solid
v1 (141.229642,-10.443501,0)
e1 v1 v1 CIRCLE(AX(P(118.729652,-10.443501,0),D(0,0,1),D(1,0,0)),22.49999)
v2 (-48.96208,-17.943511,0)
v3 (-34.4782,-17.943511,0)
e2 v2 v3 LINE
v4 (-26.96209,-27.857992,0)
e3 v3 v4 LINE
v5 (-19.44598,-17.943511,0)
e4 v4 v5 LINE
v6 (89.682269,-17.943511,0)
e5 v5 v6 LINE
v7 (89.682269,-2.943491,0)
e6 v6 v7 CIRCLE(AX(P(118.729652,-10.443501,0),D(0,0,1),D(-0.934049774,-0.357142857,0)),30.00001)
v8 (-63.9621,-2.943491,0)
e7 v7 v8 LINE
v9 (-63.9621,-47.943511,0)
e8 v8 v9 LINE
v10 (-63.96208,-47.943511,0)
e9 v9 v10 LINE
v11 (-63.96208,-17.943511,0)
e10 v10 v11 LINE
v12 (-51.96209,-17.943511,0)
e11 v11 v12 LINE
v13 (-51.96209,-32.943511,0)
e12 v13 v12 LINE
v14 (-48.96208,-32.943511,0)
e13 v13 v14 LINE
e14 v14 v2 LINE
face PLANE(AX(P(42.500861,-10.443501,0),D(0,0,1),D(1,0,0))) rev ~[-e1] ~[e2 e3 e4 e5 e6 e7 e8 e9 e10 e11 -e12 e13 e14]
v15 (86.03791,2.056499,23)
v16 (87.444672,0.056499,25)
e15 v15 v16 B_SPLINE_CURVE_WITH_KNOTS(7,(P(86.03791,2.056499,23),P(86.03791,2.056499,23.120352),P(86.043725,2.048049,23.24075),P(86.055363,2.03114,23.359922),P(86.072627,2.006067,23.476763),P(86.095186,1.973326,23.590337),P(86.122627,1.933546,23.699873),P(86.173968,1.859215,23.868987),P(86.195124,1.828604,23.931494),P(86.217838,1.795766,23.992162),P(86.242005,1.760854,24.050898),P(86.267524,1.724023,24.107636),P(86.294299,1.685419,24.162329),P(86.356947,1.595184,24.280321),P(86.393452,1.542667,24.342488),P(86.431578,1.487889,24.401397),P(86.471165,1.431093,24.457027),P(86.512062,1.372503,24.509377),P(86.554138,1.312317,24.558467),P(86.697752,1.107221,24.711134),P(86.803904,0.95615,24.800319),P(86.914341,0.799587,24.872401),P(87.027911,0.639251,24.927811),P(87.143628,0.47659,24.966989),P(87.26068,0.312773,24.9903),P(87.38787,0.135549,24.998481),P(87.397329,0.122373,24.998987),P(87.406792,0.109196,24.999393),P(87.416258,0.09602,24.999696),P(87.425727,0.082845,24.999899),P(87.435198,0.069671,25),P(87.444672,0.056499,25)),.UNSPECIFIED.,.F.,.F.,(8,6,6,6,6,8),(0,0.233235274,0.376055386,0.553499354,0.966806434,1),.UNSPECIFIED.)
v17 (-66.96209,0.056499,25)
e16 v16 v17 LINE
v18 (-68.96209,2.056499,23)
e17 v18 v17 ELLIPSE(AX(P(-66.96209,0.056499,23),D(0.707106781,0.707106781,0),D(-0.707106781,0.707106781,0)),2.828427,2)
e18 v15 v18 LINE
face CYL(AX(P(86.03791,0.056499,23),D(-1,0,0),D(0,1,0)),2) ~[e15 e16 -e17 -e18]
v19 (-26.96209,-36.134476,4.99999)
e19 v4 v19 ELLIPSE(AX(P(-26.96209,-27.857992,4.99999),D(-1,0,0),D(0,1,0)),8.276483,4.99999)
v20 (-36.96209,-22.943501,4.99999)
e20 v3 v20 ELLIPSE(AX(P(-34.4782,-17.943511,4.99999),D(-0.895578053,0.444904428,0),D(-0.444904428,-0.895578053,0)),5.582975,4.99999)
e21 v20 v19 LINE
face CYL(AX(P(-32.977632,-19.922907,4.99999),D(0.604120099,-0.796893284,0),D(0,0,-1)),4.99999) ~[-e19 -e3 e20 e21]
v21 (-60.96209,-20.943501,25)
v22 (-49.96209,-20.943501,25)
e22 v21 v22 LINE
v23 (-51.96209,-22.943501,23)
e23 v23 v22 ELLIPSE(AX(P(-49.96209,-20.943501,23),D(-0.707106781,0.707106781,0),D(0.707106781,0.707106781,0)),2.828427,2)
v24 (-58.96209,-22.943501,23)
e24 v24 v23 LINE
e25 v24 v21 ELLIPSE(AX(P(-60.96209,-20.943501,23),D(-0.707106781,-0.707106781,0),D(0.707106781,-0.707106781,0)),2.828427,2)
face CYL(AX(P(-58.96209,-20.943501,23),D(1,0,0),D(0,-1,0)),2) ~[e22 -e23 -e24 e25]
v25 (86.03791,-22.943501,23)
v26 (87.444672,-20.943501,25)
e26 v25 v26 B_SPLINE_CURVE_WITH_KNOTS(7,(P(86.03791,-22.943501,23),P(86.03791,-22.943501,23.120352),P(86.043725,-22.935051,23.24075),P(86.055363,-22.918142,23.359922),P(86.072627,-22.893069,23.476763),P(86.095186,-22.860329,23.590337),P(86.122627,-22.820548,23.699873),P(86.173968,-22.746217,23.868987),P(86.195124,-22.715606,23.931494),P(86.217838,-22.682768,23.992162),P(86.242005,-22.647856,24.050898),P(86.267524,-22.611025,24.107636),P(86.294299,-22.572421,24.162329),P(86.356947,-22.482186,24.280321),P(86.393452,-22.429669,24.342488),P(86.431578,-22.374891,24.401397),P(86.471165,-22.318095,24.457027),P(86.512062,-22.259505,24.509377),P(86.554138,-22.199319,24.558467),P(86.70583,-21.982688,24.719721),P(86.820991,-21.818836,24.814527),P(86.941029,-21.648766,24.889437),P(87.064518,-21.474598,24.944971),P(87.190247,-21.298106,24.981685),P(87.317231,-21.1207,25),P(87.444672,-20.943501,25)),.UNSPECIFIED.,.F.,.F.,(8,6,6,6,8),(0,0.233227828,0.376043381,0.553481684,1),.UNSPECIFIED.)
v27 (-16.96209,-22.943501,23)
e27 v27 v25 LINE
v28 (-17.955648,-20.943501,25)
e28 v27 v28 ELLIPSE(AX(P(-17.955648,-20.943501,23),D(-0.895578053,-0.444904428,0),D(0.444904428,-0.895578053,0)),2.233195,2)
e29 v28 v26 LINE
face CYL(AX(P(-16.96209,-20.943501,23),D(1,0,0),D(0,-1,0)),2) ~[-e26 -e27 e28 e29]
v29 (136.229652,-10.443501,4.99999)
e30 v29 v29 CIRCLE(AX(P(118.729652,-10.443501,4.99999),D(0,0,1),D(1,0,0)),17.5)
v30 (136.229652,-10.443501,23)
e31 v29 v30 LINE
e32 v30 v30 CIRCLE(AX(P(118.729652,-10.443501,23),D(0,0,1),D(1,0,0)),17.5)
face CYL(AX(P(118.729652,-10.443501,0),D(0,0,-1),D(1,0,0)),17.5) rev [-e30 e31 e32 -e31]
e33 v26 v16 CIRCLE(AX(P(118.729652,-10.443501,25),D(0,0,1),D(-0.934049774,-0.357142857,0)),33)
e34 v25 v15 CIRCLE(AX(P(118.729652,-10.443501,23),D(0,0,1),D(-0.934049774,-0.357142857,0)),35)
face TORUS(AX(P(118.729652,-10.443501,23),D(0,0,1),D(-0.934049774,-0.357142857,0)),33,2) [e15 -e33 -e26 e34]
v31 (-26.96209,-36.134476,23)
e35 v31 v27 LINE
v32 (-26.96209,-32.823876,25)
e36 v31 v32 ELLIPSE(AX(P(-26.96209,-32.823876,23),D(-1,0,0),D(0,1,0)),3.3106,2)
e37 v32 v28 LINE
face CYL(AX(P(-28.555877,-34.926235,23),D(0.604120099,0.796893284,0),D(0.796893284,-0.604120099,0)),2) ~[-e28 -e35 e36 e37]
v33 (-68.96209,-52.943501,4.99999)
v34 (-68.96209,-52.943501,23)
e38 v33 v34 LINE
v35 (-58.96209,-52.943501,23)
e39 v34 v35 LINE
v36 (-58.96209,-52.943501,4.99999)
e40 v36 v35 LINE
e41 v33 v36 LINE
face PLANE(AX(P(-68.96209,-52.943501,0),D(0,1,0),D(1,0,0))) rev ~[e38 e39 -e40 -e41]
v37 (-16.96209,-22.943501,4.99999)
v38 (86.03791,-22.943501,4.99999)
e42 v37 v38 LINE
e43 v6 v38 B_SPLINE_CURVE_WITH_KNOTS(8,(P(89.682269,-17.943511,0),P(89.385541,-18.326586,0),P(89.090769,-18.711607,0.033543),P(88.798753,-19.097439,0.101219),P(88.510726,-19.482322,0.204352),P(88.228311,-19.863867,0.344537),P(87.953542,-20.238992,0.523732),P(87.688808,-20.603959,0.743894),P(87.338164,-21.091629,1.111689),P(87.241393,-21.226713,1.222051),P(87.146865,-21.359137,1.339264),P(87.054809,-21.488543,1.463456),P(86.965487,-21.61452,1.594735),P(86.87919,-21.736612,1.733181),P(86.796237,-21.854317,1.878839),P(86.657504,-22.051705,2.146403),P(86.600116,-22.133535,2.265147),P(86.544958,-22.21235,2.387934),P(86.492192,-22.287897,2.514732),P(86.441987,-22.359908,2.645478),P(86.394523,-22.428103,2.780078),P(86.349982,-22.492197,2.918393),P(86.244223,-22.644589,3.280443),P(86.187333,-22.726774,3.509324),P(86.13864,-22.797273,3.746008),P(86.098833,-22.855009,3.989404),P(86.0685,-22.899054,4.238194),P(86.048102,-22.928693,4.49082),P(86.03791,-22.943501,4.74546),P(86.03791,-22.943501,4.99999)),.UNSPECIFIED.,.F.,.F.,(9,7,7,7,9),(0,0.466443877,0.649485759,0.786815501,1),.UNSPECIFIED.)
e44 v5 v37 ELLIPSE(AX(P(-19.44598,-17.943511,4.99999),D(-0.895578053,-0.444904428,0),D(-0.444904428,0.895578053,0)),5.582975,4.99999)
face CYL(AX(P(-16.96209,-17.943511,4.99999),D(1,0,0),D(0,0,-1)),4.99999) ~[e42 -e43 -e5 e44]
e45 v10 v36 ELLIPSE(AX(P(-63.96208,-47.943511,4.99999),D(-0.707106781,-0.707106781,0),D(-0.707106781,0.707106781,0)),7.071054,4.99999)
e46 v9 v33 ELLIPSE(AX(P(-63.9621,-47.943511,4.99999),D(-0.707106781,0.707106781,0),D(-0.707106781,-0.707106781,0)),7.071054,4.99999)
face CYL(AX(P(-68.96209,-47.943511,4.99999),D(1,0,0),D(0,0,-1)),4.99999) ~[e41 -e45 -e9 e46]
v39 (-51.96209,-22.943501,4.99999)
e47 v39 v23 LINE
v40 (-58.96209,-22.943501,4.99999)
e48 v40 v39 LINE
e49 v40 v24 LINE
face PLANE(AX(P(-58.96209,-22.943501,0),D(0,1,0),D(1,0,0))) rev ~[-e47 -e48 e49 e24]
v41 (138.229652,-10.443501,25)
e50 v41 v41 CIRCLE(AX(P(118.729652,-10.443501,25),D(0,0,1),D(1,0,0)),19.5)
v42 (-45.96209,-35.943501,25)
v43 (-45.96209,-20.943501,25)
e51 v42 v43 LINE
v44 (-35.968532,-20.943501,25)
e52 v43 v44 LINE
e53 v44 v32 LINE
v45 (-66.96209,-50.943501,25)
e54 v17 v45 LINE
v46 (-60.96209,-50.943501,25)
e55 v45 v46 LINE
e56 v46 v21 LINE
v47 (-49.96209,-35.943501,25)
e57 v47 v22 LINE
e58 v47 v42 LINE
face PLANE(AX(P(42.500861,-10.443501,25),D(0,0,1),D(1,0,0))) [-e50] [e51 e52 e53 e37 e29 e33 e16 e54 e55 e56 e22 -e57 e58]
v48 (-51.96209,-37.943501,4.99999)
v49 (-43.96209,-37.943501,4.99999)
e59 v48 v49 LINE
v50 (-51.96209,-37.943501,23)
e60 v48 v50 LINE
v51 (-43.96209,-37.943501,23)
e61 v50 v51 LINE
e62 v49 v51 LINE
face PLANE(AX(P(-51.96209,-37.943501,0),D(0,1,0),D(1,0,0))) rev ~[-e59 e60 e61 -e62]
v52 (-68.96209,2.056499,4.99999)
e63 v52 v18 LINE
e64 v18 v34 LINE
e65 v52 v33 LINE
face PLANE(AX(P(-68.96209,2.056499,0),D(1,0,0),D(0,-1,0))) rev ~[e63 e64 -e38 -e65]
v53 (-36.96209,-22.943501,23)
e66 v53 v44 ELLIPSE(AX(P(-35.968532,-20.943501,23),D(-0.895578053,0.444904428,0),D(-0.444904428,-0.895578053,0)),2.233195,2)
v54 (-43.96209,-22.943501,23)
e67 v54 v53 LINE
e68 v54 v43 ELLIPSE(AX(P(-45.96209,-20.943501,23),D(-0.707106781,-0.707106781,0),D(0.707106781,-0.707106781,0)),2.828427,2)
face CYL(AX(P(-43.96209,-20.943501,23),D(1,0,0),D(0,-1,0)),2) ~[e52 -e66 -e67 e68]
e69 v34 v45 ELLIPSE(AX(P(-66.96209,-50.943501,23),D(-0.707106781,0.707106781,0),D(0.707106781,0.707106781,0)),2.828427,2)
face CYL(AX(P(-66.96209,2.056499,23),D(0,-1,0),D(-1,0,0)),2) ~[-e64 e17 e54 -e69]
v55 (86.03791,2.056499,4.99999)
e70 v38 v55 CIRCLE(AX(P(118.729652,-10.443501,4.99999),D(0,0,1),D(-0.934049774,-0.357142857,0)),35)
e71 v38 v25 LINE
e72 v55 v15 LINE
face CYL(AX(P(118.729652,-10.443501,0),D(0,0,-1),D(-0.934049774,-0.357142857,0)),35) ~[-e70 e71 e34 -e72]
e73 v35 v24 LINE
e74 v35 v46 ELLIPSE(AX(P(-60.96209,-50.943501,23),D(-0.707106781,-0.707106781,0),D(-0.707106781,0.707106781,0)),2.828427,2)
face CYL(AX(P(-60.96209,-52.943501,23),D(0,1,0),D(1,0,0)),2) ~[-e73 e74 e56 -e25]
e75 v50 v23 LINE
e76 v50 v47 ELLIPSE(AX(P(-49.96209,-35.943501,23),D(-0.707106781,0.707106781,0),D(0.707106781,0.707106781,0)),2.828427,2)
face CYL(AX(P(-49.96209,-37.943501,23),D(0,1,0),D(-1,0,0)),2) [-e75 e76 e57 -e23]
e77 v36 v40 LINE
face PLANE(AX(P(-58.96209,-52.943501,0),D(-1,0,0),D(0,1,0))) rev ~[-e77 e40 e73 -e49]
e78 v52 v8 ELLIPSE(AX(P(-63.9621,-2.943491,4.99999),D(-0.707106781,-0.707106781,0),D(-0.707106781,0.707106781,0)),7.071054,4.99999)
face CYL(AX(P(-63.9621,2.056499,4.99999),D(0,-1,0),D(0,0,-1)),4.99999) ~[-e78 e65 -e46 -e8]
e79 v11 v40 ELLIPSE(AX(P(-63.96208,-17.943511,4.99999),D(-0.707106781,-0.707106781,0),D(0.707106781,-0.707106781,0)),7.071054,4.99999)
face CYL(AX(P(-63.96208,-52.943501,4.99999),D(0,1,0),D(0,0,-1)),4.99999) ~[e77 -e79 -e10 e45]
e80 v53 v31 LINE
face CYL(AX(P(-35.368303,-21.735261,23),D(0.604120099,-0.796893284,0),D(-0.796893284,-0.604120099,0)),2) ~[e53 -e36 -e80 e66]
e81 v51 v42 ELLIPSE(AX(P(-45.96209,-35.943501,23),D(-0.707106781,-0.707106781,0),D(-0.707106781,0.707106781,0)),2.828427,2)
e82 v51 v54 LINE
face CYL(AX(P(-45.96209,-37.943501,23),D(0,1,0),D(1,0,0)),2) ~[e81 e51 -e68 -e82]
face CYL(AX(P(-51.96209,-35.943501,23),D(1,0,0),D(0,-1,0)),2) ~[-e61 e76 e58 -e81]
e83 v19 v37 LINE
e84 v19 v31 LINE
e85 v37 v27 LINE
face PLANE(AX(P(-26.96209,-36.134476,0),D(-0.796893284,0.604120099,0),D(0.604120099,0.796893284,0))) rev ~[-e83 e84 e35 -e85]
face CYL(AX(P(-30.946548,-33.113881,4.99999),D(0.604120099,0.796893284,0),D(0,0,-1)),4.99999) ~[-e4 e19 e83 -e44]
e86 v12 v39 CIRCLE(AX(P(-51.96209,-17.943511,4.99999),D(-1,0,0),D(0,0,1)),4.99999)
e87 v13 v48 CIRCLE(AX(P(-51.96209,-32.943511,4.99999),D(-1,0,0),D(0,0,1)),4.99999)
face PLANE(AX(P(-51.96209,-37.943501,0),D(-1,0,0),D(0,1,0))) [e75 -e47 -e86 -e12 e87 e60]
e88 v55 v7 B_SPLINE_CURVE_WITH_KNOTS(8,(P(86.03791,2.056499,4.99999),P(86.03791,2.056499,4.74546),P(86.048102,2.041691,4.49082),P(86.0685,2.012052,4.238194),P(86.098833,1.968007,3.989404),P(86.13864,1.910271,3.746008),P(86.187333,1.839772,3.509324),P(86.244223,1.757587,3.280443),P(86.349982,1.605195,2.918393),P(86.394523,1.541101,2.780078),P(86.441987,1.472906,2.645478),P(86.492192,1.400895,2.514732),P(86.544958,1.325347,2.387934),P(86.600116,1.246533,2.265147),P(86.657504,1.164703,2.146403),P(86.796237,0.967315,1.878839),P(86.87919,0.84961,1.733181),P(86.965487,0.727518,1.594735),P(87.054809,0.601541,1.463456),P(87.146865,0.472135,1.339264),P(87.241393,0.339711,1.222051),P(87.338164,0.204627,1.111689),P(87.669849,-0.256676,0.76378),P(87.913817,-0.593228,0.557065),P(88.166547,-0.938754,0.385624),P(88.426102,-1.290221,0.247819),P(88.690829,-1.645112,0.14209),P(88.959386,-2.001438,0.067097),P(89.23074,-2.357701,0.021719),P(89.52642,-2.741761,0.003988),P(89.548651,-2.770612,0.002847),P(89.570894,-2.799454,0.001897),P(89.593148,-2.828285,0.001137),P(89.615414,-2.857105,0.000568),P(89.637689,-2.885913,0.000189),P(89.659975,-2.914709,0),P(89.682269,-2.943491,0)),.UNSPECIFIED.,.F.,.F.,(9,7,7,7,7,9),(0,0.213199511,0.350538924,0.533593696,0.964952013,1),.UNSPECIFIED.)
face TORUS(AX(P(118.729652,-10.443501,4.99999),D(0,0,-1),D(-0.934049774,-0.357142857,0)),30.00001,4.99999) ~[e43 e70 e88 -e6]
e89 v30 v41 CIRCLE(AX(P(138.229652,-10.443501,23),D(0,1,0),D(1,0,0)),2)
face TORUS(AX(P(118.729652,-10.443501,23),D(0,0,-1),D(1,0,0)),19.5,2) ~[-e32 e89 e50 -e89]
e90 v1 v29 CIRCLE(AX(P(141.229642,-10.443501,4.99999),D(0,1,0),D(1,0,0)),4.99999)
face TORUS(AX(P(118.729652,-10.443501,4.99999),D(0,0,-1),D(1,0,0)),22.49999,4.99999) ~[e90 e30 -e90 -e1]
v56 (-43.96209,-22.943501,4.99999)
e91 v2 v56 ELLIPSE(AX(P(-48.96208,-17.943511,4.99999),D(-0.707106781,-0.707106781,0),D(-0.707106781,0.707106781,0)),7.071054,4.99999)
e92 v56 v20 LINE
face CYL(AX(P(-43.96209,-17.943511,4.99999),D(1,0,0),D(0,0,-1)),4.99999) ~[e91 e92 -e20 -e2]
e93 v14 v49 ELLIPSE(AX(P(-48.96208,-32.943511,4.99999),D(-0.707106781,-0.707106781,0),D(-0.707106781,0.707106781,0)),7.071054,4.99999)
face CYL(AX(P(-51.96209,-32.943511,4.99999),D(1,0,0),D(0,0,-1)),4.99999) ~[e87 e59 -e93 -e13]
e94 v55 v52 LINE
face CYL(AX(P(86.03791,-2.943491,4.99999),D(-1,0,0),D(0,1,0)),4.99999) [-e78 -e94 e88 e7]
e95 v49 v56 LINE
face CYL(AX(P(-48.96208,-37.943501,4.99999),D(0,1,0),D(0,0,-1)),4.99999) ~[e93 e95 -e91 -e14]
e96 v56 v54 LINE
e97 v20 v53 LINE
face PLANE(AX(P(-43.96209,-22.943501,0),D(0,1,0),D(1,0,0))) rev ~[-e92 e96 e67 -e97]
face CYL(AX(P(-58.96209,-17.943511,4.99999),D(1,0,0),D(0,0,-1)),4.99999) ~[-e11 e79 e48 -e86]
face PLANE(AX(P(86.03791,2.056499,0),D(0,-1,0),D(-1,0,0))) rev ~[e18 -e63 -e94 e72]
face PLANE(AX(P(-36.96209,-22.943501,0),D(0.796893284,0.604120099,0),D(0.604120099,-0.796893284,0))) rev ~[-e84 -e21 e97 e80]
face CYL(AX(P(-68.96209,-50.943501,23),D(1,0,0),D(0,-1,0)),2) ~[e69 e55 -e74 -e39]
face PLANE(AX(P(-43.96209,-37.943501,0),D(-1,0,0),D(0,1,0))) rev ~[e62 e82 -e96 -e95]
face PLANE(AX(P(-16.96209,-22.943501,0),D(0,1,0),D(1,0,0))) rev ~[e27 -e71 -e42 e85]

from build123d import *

# Parameters (mm, degrees)
F0_R     = 17.5
F0_W     = 10
F0_H     = 30
F0_W_2   = 8
F0_H_2   = 15
F1_DEPTH = 25
F2_R     = 2
F3_R     = 4.99999


# Not quite as in the source:
# - a fillet or chamfer is up to 0.001 mm smaller than in the source, because OpenCascade refuses the exact size


with BuildPart() as f1:
    # F0 (on Top) → F1 (new body)
    with BuildSketch(Plane.XY):
        with BuildLine():
            Line((86.0379100244, 2.0564989746), (-68.9620899756, 2.0564989746))
            Line((-68.9620899756, 2.0564989746), (-68.9620899756, -22.9435010254))
            Line((-68.9620899756, -22.9435010254), (-58.9620899756, -22.9435010254))
            Line((-58.9620899756, -22.9435010254), (-51.9620899756, -22.9435010254))
            Line((-51.9620899756, -22.9435010254), (-43.9620899756, -22.9435010254))
            Line((-43.9620899756, -22.9435010254), (-36.9620899756, -22.9435010254))
            Line((-36.9620899756, -22.9435010254), (-16.9620899756, -22.9435010254))
            Line((-16.9620899756, -22.9435010254), (86.0379100244, -22.9435010254))
            ThreePointArc((86.0379100244, -22.9435010254), (153.7296521009, -10.4435010254), (86.0379100244, 2.0564989746))
        make_face()
        with Locations((118.7296521009, -10.4435010254)):
            Circle(F0_R, mode=Mode.SUBTRACT)
        with Locations((-63.9620899756, -37.9435010254)):
            Rectangle(F0_W, F0_H)
        with Locations((-47.9620899756, -30.4435010254)):
            Rectangle(F0_W_2, F0_H_2)
        Polygon((-26.9620899756, -36.1344755535), (-16.9620899756, -22.9435010254), (-36.9620899756, -22.9435010254), align=None)
    extrude(amount=F1_DEPTH)

    # F2
    f2_edges = [f1.edges().sort_by_distance(p)[0] for p in [
        (8.53791, 2.056499, 25),
        (34.53791, -22.943501, 25),
        (-21.96209, -29.538988, 25),
        (-31.96209, -29.538988, 25),
        (-40.46209, -22.943501, 25),
        (-43.96209, -30.443501, 25),
        (-47.96209, -37.943501, 25),
        (-55.46209, -22.943501, 25),
        (-51.96209, -30.443501, 25),
        (-58.96209, -37.943501, 25),
        (-63.96209, -52.943501, 25),
        (-68.96209, -25.443501, 25),
        (153.729652, -10.443501, 25),
        (101.229652, -10.443501, 25),
    ]]
    fillet(f2_edges, radius=F2_R)

    # F3 (radius 5 in the source; OpenCascade refuses exactly that, so slightly less here)
    f3_edges = [f1.edges().sort_by_distance(p)[0] for p in [
        (-21.96209, -29.538988, 0),
        (-31.96209, -29.538988, 0),
        (34.53791, -22.943501, 0),
        (8.53791, 2.056499, 0),
        (-43.96209, -30.443501, 0),
        (-47.96209, -37.943501, 0),
        (-40.46209, -22.943501, 0),
        (-55.46209, -22.943501, 0),
        (-58.96209, -37.943501, 0),
        (-68.96209, -25.443501, 0),
        (-63.96209, -52.943501, 0),
        (153.729652, -10.443501, 0),
        (101.229652, -10.443501, 0),
    ]]
    fillet(f3_edges, radius=F3_R)


solid = f1.part
